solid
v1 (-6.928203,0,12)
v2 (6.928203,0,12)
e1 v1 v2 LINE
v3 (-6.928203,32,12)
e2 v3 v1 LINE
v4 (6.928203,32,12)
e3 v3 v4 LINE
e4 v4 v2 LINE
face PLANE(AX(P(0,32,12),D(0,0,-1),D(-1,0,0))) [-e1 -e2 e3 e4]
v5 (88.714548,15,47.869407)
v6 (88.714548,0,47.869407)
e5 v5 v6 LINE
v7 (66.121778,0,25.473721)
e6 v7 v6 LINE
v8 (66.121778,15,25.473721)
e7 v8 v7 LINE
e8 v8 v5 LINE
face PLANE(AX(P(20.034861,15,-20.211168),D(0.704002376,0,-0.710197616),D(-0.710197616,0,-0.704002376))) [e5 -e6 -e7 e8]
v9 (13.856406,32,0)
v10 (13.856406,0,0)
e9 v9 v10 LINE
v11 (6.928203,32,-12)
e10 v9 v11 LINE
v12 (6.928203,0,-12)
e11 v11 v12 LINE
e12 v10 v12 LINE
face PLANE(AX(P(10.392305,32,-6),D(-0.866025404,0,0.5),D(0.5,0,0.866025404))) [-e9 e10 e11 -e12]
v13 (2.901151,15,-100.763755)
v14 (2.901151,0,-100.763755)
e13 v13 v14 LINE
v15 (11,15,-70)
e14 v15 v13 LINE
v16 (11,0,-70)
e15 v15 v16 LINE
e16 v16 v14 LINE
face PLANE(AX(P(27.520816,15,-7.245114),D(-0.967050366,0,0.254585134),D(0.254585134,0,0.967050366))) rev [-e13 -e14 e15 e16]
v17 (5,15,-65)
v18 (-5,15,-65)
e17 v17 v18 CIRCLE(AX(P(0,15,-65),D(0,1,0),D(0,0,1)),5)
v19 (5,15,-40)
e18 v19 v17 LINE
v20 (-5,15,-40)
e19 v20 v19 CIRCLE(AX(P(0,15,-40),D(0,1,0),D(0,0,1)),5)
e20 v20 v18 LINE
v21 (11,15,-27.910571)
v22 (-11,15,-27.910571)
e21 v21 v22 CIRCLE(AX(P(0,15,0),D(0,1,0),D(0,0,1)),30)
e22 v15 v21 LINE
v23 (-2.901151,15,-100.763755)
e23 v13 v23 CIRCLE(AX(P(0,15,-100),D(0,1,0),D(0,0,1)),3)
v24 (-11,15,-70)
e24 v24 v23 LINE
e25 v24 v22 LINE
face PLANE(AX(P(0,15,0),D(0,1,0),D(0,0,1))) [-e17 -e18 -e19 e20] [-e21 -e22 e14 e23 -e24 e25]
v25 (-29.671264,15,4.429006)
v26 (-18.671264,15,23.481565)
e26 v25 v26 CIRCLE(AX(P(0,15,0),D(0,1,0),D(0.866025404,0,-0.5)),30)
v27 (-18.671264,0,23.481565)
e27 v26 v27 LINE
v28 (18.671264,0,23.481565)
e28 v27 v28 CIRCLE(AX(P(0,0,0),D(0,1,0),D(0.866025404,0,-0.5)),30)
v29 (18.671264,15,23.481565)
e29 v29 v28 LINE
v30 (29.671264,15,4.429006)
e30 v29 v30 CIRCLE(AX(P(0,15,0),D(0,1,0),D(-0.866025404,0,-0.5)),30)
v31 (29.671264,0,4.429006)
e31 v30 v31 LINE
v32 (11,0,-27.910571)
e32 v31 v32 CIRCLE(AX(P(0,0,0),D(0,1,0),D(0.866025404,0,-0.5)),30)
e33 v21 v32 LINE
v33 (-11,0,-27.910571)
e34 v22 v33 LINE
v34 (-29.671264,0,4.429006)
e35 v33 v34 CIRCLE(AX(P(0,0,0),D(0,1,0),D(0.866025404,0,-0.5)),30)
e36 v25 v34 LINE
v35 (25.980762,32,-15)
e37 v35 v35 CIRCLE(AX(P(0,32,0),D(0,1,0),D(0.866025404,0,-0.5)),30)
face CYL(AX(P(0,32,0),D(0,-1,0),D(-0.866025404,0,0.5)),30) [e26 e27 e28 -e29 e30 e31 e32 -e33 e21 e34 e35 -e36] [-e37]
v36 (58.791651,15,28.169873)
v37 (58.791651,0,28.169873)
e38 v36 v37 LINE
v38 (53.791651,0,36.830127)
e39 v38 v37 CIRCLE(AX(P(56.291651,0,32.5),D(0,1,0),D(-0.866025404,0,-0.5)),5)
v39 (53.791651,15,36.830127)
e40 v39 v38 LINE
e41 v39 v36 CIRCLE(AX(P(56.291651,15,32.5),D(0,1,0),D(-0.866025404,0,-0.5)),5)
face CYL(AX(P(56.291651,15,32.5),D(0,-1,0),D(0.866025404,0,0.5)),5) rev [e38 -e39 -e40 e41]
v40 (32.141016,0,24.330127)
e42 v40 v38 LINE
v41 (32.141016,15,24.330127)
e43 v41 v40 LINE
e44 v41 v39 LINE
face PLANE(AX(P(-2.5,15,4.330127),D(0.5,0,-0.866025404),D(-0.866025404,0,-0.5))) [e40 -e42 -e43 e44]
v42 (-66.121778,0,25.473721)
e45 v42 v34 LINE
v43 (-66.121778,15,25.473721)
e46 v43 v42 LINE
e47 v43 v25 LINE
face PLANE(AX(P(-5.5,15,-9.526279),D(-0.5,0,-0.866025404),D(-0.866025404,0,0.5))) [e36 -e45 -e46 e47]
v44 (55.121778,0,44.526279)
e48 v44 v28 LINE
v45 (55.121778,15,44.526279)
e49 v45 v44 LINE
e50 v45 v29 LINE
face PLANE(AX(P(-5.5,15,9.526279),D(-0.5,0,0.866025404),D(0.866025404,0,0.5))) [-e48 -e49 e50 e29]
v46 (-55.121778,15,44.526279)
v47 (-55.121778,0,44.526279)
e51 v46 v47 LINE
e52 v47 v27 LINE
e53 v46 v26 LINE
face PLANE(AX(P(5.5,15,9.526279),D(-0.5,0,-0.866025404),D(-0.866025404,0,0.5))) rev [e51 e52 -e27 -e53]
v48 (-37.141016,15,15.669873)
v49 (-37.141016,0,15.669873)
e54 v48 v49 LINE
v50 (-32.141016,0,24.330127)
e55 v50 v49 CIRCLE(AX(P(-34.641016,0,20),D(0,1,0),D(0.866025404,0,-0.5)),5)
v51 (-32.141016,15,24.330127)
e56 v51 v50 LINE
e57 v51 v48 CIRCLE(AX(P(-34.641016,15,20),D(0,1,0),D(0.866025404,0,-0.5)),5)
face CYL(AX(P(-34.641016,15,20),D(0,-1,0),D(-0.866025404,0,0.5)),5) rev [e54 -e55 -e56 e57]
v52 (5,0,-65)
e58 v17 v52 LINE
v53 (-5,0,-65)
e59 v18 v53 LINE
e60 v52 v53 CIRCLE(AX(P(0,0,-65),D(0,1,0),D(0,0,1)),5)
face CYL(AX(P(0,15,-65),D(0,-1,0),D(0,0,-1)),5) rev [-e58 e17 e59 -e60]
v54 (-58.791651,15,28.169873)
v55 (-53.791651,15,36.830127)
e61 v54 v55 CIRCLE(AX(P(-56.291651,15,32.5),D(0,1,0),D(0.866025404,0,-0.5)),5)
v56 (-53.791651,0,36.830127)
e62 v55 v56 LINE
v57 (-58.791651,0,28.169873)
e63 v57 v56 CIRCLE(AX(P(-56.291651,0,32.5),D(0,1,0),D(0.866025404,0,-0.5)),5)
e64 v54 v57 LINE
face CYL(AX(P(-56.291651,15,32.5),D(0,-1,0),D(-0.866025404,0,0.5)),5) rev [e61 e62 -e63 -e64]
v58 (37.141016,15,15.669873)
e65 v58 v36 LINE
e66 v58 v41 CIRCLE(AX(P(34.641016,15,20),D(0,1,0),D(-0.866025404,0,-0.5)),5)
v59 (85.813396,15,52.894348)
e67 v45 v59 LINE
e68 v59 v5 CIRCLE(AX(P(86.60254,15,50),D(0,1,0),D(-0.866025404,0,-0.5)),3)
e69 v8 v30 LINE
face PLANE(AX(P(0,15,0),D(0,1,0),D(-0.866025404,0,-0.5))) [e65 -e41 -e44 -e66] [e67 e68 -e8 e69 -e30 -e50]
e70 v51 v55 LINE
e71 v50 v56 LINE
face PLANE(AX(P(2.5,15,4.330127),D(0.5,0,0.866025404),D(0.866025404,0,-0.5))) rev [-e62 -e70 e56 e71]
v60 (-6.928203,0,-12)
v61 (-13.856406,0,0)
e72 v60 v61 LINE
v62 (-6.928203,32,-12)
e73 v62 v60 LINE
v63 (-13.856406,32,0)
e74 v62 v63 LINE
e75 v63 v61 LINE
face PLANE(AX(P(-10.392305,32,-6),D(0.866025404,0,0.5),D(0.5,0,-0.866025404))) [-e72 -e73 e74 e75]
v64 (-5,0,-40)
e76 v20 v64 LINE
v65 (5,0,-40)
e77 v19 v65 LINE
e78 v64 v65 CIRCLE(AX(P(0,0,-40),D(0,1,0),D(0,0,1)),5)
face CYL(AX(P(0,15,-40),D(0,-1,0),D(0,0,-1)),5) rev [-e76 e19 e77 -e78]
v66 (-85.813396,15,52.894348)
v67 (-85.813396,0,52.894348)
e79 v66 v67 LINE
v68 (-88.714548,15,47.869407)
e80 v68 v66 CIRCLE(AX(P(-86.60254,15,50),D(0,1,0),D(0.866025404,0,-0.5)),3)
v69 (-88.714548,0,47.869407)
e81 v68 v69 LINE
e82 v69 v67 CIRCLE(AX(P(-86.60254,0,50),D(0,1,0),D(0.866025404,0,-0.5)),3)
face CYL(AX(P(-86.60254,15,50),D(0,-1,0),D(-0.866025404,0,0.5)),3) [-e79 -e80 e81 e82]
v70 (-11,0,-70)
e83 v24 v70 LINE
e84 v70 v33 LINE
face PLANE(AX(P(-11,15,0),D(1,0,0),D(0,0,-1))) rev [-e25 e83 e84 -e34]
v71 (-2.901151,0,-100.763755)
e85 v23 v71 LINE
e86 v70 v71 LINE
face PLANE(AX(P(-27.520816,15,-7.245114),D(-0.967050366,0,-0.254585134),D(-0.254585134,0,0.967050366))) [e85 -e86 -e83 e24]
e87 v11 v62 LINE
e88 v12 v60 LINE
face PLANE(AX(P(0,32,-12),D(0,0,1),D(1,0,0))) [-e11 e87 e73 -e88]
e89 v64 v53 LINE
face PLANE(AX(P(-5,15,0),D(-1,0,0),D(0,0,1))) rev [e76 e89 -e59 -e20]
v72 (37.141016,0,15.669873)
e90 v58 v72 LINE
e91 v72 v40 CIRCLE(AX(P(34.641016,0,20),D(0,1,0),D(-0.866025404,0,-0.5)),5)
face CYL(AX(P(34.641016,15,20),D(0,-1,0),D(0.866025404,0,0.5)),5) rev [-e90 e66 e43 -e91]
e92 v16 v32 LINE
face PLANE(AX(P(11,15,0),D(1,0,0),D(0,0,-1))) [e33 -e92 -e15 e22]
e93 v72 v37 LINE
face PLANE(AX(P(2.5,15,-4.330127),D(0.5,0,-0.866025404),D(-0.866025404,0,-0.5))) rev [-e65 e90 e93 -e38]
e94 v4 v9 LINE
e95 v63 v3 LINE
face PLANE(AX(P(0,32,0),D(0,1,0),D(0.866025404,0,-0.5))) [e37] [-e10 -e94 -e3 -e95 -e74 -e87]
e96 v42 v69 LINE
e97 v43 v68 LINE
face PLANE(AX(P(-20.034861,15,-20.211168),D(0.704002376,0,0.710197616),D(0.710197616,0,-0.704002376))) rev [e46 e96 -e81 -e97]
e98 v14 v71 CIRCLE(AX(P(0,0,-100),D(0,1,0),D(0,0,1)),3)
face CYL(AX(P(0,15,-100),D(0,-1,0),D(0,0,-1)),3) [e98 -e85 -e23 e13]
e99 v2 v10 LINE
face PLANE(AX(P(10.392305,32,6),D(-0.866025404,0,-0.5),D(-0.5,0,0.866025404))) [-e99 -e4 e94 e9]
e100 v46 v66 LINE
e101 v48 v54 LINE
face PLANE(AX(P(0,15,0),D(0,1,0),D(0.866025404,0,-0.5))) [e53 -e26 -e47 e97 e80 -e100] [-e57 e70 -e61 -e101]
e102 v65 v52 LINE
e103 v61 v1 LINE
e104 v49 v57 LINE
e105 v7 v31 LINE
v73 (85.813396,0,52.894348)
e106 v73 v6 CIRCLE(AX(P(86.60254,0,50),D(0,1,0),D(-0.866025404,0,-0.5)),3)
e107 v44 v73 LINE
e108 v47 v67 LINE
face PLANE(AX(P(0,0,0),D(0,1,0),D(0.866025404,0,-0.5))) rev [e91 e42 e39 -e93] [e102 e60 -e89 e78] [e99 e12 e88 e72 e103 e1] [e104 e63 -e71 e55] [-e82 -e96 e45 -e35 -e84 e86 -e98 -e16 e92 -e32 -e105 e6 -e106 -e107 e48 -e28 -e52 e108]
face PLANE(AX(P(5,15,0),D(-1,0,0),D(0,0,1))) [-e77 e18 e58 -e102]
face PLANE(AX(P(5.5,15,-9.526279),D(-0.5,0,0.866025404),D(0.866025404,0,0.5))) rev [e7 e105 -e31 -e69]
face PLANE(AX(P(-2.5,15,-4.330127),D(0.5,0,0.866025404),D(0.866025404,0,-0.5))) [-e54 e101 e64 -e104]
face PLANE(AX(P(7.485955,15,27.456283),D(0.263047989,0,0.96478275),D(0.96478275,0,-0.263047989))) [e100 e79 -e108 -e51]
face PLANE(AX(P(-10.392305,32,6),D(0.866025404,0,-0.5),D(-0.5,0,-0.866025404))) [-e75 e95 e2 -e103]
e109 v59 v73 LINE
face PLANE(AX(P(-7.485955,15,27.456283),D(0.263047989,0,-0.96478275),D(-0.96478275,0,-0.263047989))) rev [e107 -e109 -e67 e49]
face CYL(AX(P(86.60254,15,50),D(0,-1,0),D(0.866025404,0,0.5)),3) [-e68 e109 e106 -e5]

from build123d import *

# Parameters (mm, degrees)
SKETCH1_R           = 30
BOSS_EXTRUDE1_DEPTH = 32
BOSS_EXTRUDE2_DEPTH = 15
CIRPATTERN2_COUNT   = 3


with BuildPart() as part:
    # Sketch1 → Boss-Extrude1 (new body)
    with BuildSketch(Plane(origin=(0, 0, 0), x_dir=(1, 0, 0), z_dir=(0, 1, 0))):
        with Locations(Location((0, 0, 0), (0, 0, 270))):
            Circle(SKETCH1_R)
        Polygon((6.92820323, -12), (13.856406461, 0), (6.92820323, 12), (-6.92820323, 12), (-13.856406461, 0), (-6.92820323, -12), align=None, mode=Mode.SUBTRACT)
    extrude(amount=BOSS_EXTRUDE1_DEPTH)

    # Sketch1<3> → Boss-Extrude2 (add)
    with BuildSketch(Plane(origin=(0, 0, 0), x_dir=(1, 0, 0), z_dir=(0, 1, 0))):
        with BuildLine():
            Line((11, 27.910571474), (11, 70))
            Line((11, 70), (2.901151097, 100.763755402))
            ThreePointArc((2.901151097, 100.763755402), (0, 103), (-2.901151097, 100.763755402))
            Line((-2.901151097, 100.763755402), (-11, 70))
            Line((-11, 70), (-11, 27.910571474))
            ThreePointArc((-11, 27.910571474), (0, 30), (11, 27.910571474))
        make_face()
        with BuildLine():
            ThreePointArc((5, 40), (0, 35), (-5, 40))
            Line((-5, 40), (-5, 65))
            ThreePointArc((-5, 65), (0, 70), (5, 65))
            Line((5, 65), (5, 40))
        make_face(mode=Mode.SUBTRACT)
    extrude(amount=BOSS_EXTRUDE2_DEPTH)


with BuildPart() as cirpattern2_1:
    # CirPattern2: pattern copy
    add(part.part.rotate(Axis((0, 0, 0), (0, 1, 0)), 1 * 360 / CIRPATTERN2_COUNT))


with BuildPart() as cirpattern2_2:
    # CirPattern2: pattern copy
    add(part.part.rotate(Axis((0, 0, 0), (0, 1, 0)), 2 * 360 / CIRPATTERN2_COUNT))

    # Combine2: read off the stored shape, not the designer's step
    # Combine2: union part, CirPattern2_1
    add(part.part)
    add(cirpattern2_1.part)


solid = cirpattern2_2.part
